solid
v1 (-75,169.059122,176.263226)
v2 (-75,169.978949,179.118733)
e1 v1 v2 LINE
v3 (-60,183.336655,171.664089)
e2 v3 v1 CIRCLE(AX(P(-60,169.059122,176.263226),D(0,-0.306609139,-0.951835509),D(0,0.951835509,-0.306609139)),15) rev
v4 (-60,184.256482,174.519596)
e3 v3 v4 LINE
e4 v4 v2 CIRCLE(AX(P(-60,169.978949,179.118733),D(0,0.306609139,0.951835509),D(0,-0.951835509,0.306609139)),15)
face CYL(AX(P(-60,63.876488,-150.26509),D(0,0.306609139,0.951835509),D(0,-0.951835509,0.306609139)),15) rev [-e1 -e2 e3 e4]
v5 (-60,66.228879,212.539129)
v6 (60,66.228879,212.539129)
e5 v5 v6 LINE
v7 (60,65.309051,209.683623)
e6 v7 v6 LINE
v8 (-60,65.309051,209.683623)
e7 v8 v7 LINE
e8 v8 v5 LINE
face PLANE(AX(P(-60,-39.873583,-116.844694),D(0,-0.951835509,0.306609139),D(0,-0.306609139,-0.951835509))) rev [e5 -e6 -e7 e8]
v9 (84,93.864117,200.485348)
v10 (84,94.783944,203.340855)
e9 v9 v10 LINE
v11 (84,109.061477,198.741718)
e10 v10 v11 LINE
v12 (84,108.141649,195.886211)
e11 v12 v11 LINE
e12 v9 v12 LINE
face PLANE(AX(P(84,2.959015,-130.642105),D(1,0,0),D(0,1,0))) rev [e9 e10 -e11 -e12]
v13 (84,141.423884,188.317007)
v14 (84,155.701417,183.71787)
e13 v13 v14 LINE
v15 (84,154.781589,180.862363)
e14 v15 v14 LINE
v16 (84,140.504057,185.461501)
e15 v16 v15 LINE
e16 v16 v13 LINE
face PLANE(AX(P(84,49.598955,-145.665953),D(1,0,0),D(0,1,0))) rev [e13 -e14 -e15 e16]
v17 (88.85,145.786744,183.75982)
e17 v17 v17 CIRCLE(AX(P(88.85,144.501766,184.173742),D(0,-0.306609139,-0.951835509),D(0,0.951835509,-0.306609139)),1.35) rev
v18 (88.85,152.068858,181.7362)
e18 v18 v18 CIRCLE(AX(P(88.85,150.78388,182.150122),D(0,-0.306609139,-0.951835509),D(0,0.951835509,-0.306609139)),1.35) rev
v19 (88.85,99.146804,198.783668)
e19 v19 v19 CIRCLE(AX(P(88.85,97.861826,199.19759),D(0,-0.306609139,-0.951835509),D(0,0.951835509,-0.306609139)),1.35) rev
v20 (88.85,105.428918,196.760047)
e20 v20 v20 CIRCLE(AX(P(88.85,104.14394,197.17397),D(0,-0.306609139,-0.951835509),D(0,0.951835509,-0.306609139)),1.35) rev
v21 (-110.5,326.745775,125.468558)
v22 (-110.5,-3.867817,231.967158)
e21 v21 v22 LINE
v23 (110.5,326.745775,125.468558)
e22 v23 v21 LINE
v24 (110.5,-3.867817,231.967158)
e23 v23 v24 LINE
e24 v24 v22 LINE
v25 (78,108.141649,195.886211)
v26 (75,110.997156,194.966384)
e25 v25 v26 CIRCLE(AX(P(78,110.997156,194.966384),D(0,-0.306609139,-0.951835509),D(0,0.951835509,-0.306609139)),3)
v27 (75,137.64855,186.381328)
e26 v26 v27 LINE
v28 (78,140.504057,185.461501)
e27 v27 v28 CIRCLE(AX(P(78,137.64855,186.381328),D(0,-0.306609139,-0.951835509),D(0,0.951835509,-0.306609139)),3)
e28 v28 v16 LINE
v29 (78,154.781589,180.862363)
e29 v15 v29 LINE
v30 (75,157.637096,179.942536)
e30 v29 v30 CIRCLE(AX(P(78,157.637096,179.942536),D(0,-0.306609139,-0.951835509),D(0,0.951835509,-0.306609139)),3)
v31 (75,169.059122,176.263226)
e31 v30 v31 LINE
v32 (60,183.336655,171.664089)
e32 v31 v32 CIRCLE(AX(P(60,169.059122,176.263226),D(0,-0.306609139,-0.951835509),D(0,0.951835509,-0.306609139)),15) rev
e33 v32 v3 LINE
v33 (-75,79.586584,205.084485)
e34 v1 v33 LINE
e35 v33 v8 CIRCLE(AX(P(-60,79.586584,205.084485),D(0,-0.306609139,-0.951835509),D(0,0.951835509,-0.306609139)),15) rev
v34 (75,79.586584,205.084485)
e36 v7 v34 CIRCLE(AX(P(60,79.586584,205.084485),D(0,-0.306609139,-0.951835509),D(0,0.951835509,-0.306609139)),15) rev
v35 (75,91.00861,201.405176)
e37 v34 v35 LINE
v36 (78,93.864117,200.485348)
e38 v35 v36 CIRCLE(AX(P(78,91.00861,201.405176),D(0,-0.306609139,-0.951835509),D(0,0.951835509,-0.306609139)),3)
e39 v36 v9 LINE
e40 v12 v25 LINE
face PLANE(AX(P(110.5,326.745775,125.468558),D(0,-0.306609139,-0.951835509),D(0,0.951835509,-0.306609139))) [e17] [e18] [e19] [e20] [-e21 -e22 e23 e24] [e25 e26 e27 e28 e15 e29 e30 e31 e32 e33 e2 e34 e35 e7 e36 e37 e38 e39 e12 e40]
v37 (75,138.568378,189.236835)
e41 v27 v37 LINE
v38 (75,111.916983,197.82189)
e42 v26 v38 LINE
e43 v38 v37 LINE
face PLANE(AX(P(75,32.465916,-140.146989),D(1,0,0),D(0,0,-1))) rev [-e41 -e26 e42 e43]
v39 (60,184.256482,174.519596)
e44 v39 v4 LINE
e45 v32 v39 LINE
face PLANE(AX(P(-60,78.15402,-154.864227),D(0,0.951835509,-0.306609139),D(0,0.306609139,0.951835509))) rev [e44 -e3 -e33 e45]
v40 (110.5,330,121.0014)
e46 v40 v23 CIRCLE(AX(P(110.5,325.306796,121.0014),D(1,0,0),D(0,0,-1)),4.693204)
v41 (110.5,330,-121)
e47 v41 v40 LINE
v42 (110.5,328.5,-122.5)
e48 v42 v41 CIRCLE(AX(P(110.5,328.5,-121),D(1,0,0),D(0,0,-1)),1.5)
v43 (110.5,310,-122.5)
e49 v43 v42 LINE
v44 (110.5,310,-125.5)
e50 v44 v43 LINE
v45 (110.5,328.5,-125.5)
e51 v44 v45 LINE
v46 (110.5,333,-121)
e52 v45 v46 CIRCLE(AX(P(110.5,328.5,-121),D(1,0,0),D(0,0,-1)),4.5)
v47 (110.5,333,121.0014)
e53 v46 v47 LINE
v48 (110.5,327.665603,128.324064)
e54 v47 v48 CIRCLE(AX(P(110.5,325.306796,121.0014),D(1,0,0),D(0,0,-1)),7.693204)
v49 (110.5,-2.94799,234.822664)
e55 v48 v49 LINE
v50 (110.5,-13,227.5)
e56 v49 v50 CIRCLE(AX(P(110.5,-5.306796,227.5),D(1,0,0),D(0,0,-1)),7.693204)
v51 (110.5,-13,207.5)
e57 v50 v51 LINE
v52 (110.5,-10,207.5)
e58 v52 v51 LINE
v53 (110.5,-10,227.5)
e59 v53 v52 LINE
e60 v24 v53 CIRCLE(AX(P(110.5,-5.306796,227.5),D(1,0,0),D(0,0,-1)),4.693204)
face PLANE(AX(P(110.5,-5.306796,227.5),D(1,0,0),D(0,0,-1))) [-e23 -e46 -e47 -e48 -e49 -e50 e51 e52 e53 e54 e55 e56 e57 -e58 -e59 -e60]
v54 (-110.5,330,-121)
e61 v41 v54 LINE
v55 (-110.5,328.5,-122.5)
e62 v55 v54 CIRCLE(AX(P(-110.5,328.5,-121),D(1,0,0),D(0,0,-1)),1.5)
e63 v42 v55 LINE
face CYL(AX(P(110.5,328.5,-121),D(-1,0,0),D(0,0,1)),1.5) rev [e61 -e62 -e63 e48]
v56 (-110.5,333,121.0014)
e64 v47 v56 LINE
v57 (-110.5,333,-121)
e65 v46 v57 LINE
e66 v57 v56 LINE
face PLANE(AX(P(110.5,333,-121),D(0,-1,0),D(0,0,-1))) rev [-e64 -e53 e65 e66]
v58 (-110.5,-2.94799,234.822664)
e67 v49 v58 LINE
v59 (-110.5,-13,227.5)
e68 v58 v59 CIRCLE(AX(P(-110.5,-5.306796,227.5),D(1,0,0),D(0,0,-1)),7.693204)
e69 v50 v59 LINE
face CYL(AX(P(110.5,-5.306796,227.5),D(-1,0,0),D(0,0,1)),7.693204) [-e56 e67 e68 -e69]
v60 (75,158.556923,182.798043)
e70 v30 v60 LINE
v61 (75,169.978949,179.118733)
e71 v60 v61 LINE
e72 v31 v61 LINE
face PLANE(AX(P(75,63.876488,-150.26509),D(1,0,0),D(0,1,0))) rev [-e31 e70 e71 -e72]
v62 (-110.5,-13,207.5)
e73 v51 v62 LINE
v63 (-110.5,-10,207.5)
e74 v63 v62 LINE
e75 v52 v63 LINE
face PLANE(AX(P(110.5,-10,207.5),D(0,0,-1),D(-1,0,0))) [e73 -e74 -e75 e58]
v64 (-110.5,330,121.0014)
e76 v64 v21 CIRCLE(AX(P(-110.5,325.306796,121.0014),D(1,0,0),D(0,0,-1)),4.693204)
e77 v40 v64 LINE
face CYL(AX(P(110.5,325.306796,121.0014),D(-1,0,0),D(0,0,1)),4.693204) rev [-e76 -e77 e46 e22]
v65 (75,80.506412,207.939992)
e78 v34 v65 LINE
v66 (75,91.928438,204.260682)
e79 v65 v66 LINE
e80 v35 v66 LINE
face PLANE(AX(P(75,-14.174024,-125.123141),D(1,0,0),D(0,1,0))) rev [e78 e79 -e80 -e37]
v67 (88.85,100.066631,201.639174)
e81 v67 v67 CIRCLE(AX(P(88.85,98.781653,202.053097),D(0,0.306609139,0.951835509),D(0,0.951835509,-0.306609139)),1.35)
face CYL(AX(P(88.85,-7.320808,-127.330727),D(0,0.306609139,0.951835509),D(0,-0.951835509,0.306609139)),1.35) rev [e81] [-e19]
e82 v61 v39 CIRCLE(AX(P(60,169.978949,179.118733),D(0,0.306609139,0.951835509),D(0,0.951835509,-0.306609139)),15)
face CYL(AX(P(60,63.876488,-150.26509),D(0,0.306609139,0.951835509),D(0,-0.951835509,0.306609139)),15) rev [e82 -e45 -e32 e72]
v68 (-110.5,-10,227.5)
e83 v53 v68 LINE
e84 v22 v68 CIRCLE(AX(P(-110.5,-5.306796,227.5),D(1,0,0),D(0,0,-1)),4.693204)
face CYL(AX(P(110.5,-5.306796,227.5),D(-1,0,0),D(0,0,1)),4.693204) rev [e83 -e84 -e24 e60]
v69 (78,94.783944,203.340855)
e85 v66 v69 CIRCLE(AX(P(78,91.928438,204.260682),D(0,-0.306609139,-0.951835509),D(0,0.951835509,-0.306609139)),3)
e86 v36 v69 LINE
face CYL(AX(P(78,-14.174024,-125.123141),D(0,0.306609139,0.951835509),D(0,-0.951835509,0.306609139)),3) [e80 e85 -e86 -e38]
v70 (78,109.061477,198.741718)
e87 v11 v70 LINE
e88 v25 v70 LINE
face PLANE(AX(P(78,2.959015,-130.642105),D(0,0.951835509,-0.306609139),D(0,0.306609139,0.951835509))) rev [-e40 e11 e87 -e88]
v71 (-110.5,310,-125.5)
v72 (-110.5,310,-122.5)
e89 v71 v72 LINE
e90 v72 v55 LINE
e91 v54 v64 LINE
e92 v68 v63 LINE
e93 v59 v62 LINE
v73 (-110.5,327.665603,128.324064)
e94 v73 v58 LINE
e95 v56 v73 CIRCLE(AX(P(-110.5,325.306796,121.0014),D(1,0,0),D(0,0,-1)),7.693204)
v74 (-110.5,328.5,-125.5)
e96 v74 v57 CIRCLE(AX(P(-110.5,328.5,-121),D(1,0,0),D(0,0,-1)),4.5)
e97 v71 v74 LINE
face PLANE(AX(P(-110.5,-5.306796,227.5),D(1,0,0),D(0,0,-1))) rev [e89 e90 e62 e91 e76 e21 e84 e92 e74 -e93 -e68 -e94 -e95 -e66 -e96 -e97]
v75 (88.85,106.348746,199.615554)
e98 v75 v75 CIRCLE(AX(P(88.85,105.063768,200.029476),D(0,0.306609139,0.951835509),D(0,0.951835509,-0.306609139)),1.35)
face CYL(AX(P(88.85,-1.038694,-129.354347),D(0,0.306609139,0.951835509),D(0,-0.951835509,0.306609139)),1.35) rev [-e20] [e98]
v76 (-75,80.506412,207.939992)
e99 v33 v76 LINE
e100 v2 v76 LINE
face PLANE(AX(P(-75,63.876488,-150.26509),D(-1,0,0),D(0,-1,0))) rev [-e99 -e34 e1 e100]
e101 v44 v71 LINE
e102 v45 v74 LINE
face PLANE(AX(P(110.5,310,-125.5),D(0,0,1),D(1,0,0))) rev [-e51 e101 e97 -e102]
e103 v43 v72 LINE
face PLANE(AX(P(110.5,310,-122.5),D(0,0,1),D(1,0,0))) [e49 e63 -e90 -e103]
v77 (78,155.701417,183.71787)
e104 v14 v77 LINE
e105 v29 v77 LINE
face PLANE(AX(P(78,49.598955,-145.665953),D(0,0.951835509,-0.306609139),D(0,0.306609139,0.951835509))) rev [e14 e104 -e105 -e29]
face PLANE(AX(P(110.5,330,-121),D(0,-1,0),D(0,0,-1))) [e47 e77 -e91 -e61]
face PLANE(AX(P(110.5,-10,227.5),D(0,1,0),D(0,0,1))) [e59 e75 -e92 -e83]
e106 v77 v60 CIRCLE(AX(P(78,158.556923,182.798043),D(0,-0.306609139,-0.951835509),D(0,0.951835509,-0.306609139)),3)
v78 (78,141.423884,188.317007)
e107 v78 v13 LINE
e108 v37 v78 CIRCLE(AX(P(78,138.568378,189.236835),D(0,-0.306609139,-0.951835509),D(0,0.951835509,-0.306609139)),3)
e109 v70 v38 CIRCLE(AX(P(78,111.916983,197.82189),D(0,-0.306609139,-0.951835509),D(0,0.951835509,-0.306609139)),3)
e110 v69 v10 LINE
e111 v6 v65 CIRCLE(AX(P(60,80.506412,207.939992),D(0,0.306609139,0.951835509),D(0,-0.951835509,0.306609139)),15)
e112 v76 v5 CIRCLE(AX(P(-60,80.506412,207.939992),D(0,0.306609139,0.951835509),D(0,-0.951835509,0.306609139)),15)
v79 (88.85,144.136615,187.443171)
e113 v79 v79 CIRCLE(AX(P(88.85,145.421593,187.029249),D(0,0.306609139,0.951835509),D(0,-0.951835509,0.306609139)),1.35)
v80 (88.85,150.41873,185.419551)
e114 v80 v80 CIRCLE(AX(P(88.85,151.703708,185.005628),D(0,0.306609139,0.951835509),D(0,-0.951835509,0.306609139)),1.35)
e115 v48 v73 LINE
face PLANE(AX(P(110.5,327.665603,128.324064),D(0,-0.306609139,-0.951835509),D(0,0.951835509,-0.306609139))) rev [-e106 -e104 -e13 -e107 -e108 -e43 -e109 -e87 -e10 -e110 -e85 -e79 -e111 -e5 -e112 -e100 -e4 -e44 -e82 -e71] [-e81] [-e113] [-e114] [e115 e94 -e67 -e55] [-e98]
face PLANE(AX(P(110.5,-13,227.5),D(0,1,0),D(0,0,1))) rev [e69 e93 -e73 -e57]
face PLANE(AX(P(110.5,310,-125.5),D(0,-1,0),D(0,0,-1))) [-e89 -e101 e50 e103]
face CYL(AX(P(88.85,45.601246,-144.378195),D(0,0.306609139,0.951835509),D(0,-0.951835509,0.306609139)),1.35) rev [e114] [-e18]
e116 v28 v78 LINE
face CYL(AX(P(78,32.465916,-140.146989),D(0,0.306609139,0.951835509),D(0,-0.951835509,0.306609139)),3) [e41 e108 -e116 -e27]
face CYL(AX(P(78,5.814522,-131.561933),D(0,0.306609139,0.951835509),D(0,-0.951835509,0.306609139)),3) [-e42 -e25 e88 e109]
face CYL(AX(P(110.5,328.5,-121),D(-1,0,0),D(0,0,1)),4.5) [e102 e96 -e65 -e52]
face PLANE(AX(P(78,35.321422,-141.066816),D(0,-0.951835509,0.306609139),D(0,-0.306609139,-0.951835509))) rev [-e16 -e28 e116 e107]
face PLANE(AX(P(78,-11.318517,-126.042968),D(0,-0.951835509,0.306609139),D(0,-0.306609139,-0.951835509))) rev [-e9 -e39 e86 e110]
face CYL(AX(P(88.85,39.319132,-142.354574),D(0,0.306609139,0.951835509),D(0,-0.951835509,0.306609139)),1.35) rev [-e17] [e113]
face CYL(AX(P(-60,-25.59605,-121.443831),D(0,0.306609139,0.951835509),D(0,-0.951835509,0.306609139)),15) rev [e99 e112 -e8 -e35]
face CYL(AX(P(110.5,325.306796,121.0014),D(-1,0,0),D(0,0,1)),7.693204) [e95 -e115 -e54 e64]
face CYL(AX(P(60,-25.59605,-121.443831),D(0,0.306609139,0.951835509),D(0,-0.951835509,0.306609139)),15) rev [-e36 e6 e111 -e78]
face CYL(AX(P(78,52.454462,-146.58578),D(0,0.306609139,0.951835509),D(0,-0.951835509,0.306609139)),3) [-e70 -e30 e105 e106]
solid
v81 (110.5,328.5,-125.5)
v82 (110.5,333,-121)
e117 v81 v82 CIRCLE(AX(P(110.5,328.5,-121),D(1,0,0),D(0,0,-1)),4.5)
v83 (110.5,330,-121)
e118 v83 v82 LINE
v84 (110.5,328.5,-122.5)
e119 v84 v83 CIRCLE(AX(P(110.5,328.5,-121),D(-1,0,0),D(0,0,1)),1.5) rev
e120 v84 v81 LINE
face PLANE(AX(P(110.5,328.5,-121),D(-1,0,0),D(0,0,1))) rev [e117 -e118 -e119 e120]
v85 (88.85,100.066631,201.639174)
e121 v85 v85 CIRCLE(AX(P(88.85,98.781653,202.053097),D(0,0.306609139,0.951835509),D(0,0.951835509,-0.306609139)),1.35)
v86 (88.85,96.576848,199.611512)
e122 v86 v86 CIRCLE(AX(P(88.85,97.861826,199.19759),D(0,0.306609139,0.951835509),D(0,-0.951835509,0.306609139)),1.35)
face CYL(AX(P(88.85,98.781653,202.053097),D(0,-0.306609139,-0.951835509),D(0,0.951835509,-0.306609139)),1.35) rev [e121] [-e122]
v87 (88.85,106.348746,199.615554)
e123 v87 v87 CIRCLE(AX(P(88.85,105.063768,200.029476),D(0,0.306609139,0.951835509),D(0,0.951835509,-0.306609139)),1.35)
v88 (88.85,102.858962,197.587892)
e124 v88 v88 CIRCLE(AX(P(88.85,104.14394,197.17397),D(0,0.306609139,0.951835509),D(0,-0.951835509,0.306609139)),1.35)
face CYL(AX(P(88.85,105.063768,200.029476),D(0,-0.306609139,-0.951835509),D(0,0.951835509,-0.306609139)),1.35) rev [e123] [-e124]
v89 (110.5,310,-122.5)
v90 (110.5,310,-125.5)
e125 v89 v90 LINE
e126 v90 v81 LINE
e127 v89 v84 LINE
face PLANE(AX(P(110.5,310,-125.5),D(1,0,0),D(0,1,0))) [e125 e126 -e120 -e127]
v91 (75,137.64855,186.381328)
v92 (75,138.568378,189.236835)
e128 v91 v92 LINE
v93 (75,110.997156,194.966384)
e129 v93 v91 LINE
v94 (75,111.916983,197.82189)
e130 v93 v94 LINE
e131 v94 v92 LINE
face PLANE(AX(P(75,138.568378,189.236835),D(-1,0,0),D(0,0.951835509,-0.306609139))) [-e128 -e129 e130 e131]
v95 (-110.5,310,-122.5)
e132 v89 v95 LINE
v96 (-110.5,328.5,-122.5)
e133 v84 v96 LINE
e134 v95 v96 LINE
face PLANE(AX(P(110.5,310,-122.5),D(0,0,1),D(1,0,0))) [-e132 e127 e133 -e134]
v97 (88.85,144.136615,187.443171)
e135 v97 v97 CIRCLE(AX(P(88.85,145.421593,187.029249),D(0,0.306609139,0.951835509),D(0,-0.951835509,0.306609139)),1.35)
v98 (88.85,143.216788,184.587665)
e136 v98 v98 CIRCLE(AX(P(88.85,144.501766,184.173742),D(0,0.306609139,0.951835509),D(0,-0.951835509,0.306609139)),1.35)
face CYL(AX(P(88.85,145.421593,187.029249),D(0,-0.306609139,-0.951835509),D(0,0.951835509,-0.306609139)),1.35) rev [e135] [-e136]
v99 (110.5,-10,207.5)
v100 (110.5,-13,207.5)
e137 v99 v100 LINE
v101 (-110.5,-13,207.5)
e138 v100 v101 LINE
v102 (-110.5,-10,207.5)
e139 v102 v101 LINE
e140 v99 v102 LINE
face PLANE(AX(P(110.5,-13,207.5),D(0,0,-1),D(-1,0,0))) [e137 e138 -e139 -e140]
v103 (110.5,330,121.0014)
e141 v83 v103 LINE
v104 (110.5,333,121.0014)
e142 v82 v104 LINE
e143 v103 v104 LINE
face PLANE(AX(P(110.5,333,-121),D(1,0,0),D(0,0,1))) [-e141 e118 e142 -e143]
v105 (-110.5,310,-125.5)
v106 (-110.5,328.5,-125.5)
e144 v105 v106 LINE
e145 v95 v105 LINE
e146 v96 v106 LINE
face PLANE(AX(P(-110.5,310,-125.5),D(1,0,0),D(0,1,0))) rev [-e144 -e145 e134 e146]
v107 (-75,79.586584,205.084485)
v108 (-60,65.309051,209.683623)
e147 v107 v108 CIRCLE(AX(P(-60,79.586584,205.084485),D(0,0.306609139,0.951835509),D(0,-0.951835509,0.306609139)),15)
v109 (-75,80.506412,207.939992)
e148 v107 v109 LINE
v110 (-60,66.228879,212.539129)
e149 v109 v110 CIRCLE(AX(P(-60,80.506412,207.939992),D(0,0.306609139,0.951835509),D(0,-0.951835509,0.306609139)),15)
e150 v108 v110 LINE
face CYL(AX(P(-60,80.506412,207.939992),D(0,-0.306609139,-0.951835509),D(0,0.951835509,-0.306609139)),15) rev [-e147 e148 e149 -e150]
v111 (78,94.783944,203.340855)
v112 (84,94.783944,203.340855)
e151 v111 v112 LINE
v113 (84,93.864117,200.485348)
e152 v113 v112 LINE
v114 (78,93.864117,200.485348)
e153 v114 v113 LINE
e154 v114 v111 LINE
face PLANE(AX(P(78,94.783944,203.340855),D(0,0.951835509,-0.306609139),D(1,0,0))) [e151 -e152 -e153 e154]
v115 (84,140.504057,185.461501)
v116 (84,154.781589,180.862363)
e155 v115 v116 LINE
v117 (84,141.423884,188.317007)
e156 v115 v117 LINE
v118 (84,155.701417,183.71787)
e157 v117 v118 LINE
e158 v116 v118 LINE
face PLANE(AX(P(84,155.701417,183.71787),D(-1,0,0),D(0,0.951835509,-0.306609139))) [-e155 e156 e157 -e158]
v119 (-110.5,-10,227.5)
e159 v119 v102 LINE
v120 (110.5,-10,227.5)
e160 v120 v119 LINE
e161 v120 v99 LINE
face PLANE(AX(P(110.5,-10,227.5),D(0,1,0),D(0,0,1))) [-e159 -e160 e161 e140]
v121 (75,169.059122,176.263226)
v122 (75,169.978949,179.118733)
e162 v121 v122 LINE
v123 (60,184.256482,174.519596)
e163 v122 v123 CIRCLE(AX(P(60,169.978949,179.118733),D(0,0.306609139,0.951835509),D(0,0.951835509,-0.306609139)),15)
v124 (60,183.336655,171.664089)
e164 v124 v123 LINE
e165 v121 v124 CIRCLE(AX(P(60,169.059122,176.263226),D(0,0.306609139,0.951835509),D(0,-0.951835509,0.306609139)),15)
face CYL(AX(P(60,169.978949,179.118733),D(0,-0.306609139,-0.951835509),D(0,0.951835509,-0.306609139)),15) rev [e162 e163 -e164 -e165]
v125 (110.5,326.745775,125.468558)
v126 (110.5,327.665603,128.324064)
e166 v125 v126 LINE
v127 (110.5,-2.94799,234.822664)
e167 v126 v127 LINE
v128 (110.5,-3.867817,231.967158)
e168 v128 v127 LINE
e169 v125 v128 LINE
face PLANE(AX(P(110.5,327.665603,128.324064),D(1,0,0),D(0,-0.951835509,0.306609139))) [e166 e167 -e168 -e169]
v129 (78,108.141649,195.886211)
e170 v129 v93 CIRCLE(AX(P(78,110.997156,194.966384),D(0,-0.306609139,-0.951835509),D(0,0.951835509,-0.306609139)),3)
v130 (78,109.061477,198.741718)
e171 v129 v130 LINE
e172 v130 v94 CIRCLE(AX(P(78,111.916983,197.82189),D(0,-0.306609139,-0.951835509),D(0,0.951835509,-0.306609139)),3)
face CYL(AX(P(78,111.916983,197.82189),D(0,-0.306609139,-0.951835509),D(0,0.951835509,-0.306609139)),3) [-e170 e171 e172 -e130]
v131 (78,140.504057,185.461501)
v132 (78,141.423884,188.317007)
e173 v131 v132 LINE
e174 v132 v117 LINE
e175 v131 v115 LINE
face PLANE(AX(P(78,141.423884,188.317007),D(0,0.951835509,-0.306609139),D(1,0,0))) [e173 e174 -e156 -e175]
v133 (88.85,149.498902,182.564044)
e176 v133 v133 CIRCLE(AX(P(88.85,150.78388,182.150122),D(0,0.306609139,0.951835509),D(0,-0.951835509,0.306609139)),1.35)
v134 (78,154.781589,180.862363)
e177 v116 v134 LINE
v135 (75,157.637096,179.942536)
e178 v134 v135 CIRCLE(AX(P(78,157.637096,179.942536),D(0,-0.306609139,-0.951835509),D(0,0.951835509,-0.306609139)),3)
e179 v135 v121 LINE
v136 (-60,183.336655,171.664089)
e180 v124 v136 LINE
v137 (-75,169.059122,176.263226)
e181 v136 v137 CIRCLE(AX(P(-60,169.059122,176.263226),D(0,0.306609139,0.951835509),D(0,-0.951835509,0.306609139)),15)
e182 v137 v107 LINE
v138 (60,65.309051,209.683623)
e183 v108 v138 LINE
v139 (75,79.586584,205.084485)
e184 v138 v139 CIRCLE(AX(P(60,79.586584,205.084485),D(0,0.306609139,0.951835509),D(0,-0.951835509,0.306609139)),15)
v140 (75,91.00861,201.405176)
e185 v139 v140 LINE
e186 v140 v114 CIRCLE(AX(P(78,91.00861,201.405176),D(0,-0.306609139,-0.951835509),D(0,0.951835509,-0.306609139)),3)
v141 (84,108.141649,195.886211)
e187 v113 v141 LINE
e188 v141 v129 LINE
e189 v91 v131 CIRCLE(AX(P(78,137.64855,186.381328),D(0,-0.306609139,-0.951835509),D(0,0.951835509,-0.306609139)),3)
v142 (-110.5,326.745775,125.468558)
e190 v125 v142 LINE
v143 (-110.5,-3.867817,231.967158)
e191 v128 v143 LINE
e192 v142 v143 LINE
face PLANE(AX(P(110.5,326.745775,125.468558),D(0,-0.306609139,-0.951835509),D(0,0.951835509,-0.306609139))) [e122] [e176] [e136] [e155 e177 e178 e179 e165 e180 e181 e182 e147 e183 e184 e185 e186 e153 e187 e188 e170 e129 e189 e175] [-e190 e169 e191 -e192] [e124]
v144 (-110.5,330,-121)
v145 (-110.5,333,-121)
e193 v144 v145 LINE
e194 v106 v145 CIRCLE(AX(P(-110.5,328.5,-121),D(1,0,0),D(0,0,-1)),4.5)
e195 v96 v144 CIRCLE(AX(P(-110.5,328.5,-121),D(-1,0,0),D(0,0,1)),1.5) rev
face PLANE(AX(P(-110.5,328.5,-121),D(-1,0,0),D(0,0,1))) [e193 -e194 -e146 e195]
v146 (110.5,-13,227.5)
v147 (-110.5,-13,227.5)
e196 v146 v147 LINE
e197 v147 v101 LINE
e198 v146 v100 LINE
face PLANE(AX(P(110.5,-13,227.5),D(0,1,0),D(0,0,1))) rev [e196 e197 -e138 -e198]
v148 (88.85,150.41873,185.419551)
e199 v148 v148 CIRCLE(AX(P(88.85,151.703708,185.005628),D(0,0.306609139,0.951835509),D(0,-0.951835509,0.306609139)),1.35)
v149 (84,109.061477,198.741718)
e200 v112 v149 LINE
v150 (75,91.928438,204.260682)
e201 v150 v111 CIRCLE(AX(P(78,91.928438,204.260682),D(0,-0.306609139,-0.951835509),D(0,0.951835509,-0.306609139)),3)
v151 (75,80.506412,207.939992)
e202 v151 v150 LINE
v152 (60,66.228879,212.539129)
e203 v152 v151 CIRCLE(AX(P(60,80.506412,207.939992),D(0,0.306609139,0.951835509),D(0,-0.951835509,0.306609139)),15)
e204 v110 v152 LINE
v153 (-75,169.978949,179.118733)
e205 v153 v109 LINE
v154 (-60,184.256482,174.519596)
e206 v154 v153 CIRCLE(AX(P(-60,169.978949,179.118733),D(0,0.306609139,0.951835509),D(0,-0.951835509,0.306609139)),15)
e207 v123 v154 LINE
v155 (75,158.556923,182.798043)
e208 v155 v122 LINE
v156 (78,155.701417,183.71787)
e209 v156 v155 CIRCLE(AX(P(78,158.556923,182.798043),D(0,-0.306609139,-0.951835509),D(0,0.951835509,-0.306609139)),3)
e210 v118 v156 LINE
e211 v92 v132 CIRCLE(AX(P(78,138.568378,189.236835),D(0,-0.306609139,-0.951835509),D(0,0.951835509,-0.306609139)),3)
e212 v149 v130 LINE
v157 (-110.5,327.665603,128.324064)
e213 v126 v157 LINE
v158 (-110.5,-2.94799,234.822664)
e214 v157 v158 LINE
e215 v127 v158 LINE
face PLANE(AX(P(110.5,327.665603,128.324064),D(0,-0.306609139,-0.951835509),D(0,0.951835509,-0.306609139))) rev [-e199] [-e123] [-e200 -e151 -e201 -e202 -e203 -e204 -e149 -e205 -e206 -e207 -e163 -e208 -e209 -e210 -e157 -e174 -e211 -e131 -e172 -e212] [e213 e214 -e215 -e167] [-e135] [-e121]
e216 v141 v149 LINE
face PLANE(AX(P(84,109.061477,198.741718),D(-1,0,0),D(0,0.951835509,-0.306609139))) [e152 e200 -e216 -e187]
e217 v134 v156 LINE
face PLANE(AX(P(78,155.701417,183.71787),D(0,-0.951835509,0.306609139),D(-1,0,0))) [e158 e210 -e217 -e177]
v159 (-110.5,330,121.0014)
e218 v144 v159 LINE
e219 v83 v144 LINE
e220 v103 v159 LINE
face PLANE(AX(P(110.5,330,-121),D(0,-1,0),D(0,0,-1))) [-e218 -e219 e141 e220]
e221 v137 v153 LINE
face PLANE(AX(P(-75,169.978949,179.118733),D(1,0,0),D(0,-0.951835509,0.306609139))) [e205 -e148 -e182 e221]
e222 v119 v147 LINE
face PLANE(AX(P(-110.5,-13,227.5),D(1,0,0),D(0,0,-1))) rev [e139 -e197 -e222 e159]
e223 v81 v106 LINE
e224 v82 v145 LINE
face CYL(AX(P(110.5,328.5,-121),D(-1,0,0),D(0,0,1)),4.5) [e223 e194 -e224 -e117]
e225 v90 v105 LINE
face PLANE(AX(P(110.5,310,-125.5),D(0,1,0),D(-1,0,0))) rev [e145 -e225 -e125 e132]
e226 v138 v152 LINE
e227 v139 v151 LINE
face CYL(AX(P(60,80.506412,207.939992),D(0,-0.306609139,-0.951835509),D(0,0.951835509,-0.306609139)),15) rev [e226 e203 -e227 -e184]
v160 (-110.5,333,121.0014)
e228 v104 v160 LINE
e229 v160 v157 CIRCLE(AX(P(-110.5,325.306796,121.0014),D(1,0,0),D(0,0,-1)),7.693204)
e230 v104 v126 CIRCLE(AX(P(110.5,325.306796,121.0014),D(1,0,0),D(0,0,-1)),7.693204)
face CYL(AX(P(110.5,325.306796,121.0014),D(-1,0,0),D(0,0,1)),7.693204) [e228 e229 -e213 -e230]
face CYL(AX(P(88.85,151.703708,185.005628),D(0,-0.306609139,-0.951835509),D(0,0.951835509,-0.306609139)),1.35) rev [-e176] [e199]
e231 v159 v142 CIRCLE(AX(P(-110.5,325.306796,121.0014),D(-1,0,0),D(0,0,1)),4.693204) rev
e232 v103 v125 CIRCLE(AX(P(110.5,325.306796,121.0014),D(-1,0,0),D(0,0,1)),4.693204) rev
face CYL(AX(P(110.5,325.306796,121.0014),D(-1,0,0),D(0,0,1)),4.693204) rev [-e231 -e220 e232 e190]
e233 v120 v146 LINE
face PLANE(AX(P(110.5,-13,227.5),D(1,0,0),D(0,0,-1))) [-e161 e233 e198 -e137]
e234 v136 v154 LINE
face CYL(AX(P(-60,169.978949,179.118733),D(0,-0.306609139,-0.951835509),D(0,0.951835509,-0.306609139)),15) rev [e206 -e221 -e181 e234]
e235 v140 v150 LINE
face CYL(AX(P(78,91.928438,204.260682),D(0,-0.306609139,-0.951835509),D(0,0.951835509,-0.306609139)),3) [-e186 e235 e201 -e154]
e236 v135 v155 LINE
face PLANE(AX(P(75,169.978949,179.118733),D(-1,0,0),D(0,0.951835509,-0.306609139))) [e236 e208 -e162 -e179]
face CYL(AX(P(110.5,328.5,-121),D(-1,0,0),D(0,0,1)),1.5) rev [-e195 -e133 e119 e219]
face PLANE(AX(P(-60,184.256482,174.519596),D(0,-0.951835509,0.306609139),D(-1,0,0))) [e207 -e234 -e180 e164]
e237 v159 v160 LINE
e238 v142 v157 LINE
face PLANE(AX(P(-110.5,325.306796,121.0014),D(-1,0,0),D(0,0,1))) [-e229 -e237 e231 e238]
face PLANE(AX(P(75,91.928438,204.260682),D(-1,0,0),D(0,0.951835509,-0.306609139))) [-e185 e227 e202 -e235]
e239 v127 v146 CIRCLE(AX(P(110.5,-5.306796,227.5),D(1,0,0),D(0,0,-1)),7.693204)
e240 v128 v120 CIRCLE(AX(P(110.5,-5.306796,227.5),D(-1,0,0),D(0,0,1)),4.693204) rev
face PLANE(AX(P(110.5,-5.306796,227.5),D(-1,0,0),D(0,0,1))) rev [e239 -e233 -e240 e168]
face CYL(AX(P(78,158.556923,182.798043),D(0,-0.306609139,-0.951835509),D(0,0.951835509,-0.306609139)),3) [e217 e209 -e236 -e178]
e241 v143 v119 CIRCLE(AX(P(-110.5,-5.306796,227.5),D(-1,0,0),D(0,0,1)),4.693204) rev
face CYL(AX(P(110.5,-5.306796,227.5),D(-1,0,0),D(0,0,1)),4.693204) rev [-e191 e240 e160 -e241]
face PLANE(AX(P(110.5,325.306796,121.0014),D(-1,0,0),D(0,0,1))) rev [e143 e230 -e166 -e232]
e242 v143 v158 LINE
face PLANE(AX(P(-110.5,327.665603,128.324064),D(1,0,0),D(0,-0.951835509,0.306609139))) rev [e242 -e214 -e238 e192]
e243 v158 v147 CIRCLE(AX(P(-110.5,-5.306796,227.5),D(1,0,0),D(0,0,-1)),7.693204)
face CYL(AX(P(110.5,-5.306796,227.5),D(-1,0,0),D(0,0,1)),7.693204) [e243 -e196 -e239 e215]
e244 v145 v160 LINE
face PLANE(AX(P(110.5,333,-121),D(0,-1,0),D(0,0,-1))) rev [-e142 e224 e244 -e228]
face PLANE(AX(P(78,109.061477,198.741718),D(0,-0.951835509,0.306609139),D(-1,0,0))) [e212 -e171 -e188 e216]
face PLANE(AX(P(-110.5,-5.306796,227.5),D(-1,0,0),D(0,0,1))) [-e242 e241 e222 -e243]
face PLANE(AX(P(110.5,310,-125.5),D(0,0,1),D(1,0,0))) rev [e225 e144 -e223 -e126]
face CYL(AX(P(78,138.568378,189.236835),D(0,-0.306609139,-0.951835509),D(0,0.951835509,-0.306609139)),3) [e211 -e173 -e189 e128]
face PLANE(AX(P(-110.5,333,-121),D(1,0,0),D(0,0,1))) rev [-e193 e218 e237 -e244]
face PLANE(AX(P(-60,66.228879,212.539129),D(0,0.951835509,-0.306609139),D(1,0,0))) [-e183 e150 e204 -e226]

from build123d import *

# Parameters (mm, degrees)
EXTRUDE_THIN1_DEPTH    = 110.5
CUT_EXTRUDE1_REACH     = 444.866
SKETCH2_R              = 1.35
CONVERT_SOLID1_START   = -110.5
CONVERT_SOLID1_DEPTH   = 221
CONVERT_SOLID1_2_DEPTH = 35.5
CONVERT_SOLID1_START_2 = 78
CONVERT_SOLID1_3_DEPTH = 32.5
CONVERT_SOLID1_START_3 = 90.2000001
CONVERT_SOLID1_4_DEPTH = 20.2999999
CONVERT_SOLID1_START_4 = 84
CONVERT_SOLID1_5_DEPTH = 3.4999999
CONVERT_SOLID1_START_5 = 219.608669628
CONVERT_SOLID1_6_DEPTH = 3.000000001


with BuildPart() as part:
    # Sketch1 → Extrude-Thin1 (new, symmetric)
    with BuildSketch(Plane(origin=(0, 0, 0), x_dir=(0, 0, -1), z_dir=(1, 0, 0))):
        with BuildLine():
            Line((122.5, 310), (122.5, 328.5))
            ThreePointArc((122.5, 328.5), (122.060660172, 329.560660172), (121, 330))
            Line((121, 330), (-121.0014, 330))
            ThreePointArc((-121.0014, 330), (-123.764798126, 329.10018419), (-125.468557887, 326.745775479))
            Line((-125.468557887, 326.745775479), (-231.967157887, -3.867817213))
            ThreePointArc((-231.967157887, -3.867817213), (-231.293387843, -8.070194473), (-227.5, -10))
            Line((-227.5, -10), (-207.5, -10))
            Line((-207.5, -10), (-207.5, -13))
            Line((-207.5, -13), (-227.5, -13))
            ThreePointArc((-227.5, -13), (-233.718205595, -9.836619923), (-234.822664414, -2.947989795))
            Line((-234.822664414, -2.947989795), (-128.324064414, 327.665602897))
            ThreePointArc((-128.324064414, 327.665602897), (-125.531223577, 331.525001941), (-121.0014, 333))
            Line((-121.0014, 333), (121, 333))
            ThreePointArc((121, 333), (124.181980515, 331.681980515), (125.5, 328.5))
            Line((125.5, 328.5), (125.5, 310))
            Line((125.5, 310), (122.5, 310))
        make_face()
    extrude(amount=EXTRUDE_THIN1_DEPTH, both=True)

    # Sketch2 → Cut-Extrude1 (cut, up to next)
    with BuildSketch(Plane(origin=(0, 68.253852605, 211.886836303), x_dir=(1, 0, 0), z_dir=(0, 0.30660913934042044, 0.9518355087266532)), mode=Mode.PRIVATE) as cut_extrude1_sk1:
        with Locations(Location((88.85, 87.672559187, 0), (0, 0, 270))):
            Circle(SKETCH2_R)
    cut_extrude1_tool1 = extrude(cut_extrude1_sk1.sketch, amount=-CUT_EXTRUDE1_REACH, mode=Mode.PRIVATE) & part.part
    # Sketch2 → Cut-Extrude1 (cut, up to next)
    with BuildSketch(Plane(origin=(0, 68.253852605, 211.886836303), x_dir=(1, 0, 0), z_dir=(0, 0.30660913934042044, 0.9518355087266532)), mode=Mode.PRIVATE) as cut_extrude1_sk2:
        with Locations(Location((88.85, 81.072559187, 0), (0, 0, 270))):
            Circle(SKETCH2_R)
    cut_extrude1_tool2 = extrude(cut_extrude1_sk2.sketch, amount=-CUT_EXTRUDE1_REACH, mode=Mode.PRIVATE) & part.part
    # Sketch2 → Cut-Extrude1 (cut, up to next)
    with BuildSketch(Plane(origin=(0, 68.253852605, 211.886836303), x_dir=(1, 0, 0), z_dir=(0, 0.30660913934042044, 0.9518355087266532)), mode=Mode.PRIVATE) as cut_extrude1_sk3:
        with Locations(Location((88.85, 38.672559187, 0), (0, 0, 90))):
            Circle(SKETCH2_R)
    cut_extrude1_tool3 = extrude(cut_extrude1_sk3.sketch, amount=-CUT_EXTRUDE1_REACH, mode=Mode.PRIVATE) & part.part
    # Sketch2 → Cut-Extrude1 (cut, up to next)
    with BuildSketch(Plane(origin=(0, 68.253852605, 211.886836303), x_dir=(1, 0, 0), z_dir=(0, 0.30660913934042044, 0.9518355087266532)), mode=Mode.PRIVATE) as cut_extrude1_sk4:
        with Locations(Location((88.85, 32.072559187, 0), (0, 0, 90))):
            Circle(SKETCH2_R)
    cut_extrude1_tool4 = extrude(cut_extrude1_sk4.sketch, amount=-CUT_EXTRUDE1_REACH, mode=Mode.PRIVATE) & part.part
    # Sketch2 → Cut-Extrude1 (cut, up to next)
    with BuildSketch(Plane(origin=(0, 68.253852605, 211.886836303), x_dir=(1, 0, 0), z_dir=(0, 0.30660913934042044, 0.9518355087266532)), mode=Mode.PRIVATE) as cut_extrude1_sk5:
        with BuildLine():
            Line((-60, 121.872559187), (60, 121.872559187))
            ThreePointArc((60, 121.872559187), (70.606601718, 117.479160904), (75, 106.872559187))
            Line((75, 106.872559187), (75, 94.872559187))
            ThreePointArc((75, 94.872559187), (75.878679656, 92.751238843), (78, 91.872559187))
            Line((78, 91.872559187), (84, 91.872559187))
            Line((84, 91.872559187), (84, 76.872559187))
            Line((84, 76.872559187), (78, 76.872559187))
            ThreePointArc((78, 76.872559187), (75.878679656, 75.99387953), (75, 73.872559187))
            Line((75, 73.872559187), (75, 45.872559187))
            ThreePointArc((75, 45.872559187), (75.878679656, 43.751238843), (78, 42.872559187))
            Line((78, 42.872559187), (84, 42.872559187))
            Line((84, 42.872559187), (84, 27.872559187))
            Line((84, 27.872559187), (78, 27.872559187))
            ThreePointArc((78, 27.872559187), (75.878679656, 26.99387953), (75, 24.872559187))
            Line((75, 24.872559187), (75, 12.872559187))
            ThreePointArc((75, 12.872559187), (70.606601718, 2.265957469), (60, -2.127440813))
            Line((60, -2.127440813), (-60, -2.127440813))
            ThreePointArc((-60, -2.127440813), (-70.606601718, 2.265957469), (-75, 12.872559187))
            Line((-75, 12.872559187), (-75, 106.872559187))
            ThreePointArc((-75, 106.872559187), (-70.606601718, 117.479160904), (-60, 121.872559187))
        make_face()
    cut_extrude1_tool5 = extrude(cut_extrude1_sk5.sketch, amount=-CUT_EXTRUDE1_REACH, mode=Mode.PRIVATE) & part.part
    add(cut_extrude1_tool1.solids().sort_by_distance((88.85, 151.703708, 185.005628))[0], mode=Mode.SUBTRACT)
    add(cut_extrude1_tool2.solids().sort_by_distance((88.85, 145.421593, 187.029249))[0], mode=Mode.SUBTRACT)
    add(cut_extrude1_tool3.solids().sort_by_distance((88.85, 105.063768, 200.029476))[0], mode=Mode.SUBTRACT)
    add(cut_extrude1_tool4.solids().sort_by_distance((88.85, 98.781653, 202.053097))[0], mode=Mode.SUBTRACT)
    add(cut_extrude1_tool5.solids().sort_by_distance((1.180096, 125.24268, 193.529362))[0], mode=Mode.SUBTRACT)


with BuildPart() as body_2:
    # Convert-Solid1: read off the stored shape, not the designer's step
    # Convert-Solid1 outline → Convert-Solid1 (new body)
    with BuildSketch(Plane.YZ.offset(CONVERT_SOLID1_START)):
        with BuildLine():
            Line((-13, 227.5), (-13, 207.5))
            Line((-13, 207.5), (-10, 207.5))
            Line((-10, 207.5), (-10, 227.5))
            ThreePointArc((-10, 227.5), (-8.070194473, 231.293387843), (-3.867817213, 231.967157887))
            Line((-3.867817213, 231.967157887), (65.309051478, 209.683622573))
            Line((65.309051478, 209.683622573), (66.228878896, 212.5391291))
            Line((66.228878896, 212.5391291), (-2.947989795, 234.822664414))
            ThreePointArc((-2.947989795, 234.822664414), (-9.836619923, 233.718205595), (-13, 227.5))
        make_face()
        with BuildLine():
            Line((327.665602897, 128.324064414), (184.256481978, 174.519595822))
            Line((184.256481978, 174.519595822), (183.33665456, 171.664089295))
            Line((183.33665456, 171.664089295), (326.745775479, 125.468557887))
            ThreePointArc((326.745775479, 125.468557887), (329.10018419, 123.764798127), (330, 121.0014))
            Line((330, 121.0014), (330, -121))
            ThreePointArc((330, -121), (329.560660172, -122.060660172), (328.5, -122.5))
            Line((328.5, -122.5), (310, -122.5))
            Line((310, -122.5), (310, -125.5))
            Line((310, -125.5), (328.5, -125.5))
            ThreePointArc((328.5, -125.5), (331.681980515, -124.181980515), (333, -121))
            Line((333, -121), (333, 121.0014))
            ThreePointArc((333, 121.0014), (331.525001941, 125.531223577), (327.665602897, 128.324064414))
        make_face()
    extrude(amount=CONVERT_SOLID1_DEPTH)

    # Convert-Solid1 2 outline → Convert-Solid1 2 (add)
    with BuildSketch(Plane.YZ.offset(CONVERT_SOLID1_START)):
        Polygon((66.228878896, 212.5391291), (65.309051478, 209.683622574), (183.33665456, 171.664089295), (184.256481978, 174.519595822), align=None)
    extrude(amount=CONVERT_SOLID1_2_DEPTH)

    # Convert-Solid1 3 outline → Convert-Solid1 3 (add)
    with BuildSketch(Plane.YZ.offset(CONVERT_SOLID1_START_2)):
        Polygon((94.783944157, 203.34085492), (66.228878896, 212.5391291), (65.309051478, 209.683622574), (93.864116739, 200.485348393), align=None)
        Polygon((141.423884085, 188.317007092), (109.061476788, 198.74171783), (108.14164937, 195.886211303), (140.504056667, 185.461500565), align=None)
        Polygon((184.256481978, 174.519595822), (155.701416716, 183.717870002), (154.781589298, 180.862363476), (183.33665456, 171.664089295), align=None)
    extrude(amount=CONVERT_SOLID1_3_DEPTH)

    # Convert-Solid1 4 outline → Convert-Solid1 4 (add)
    with BuildSketch(Plane.YZ.offset(CONVERT_SOLID1_START_3)):
        Polygon((109.061476788, 198.74171783), (94.783944157, 203.34085492), (93.864116739, 200.485348393), (108.14164937, 195.886211303), align=None)
        Polygon((155.701416716, 183.717870002), (141.423884085, 188.317007092), (140.504056667, 185.461500566), (154.781589298, 180.862363475), align=None)
    extrude(amount=CONVERT_SOLID1_4_DEPTH)

    # Convert-Solid1 5 outline → Convert-Solid1 5 (add)
    with BuildSketch(Plane.YZ.offset(CONVERT_SOLID1_START_4)):
        Polygon((109.061476788, 198.74171783), (94.783944157, 203.34085492), (93.864116739, 200.485348393), (108.14164937, 195.886211303), align=None)
        Polygon((155.701416716, 183.717870002), (141.423884085, 188.317007092), (140.504056667, 185.461500566), (154.781589298, 180.862363475), align=None)
    extrude(amount=CONVERT_SOLID1_5_DEPTH)

    # Convert-Solid1 6 outline → Convert-Solid1 6 (add)
    with BuildSketch(Plane(origin=(0, 0, 0), x_dir=(1, 0, 0), z_dir=(0, 0.3066091393404201, 0.9518355087266533)).offset(CONVERT_SOLID1_START_5)):
        with BuildLine():
            Line((90.2000001, 27.872559186), (90.2, 32.072559187))
            ThreePointArc((90.2, 32.072559187), (88.85, 30.722559187), (87.5, 32.072559187))
            Line((87.5, 32.072559187), (87.4999999, 27.872559186))
            Line((87.4999999, 27.872559186), (90.2000001, 27.872559186))
        make_face()
        with BuildLine():
            ThreePointArc((87.5, 32.072559187), (88.85, 33.422559187), (90.2, 32.072559187))
            Line((90.2, 32.072559187), (90.2, 38.672559187))
            ThreePointArc((90.2, 38.672559187), (88.85, 37.322559187), (87.5, 38.672559187))
            Line((87.5, 38.672559187), (87.5, 32.072559187))
        make_face()
        with BuildLine():
            ThreePointArc((87.5, 38.672559187), (88.85, 40.022559187), (90.2, 38.672559187))
            Line((90.2, 38.672559187), (90.2000001, 42.872559186))
            Line((90.2000001, 42.872559186), (87.4999999, 42.872559186))
            Line((87.4999999, 42.872559186), (87.5, 38.672559187))
        make_face()
        with BuildLine():
            Line((90.2000001, 76.872559186), (90.2, 81.072559187))
            ThreePointArc((90.2, 81.072559187), (88.85, 79.722559187), (87.5, 81.072559187))
            Line((87.5, 81.072559187), (87.4999999, 76.872559186))
            Line((87.4999999, 76.872559186), (90.2000001, 76.872559186))
        make_face()
        with BuildLine():
            ThreePointArc((87.5, 81.072559187), (88.85, 82.422559187), (90.2, 81.072559187))
            Line((90.2, 81.072559187), (90.2, 87.672559187))
            ThreePointArc((90.2, 87.672559187), (88.85, 86.322559187), (87.5, 87.672559187))
            Line((87.5, 87.672559187), (87.5, 81.072559187))
        make_face()
        with BuildLine():
            ThreePointArc((87.5, 87.672559187), (88.85, 89.022559187), (90.2, 87.672559187))
            Line((90.2, 87.672559187), (90.2000001, 91.872559187))
            Line((90.2000001, 91.872559187), (87.4999999, 91.872559187))
            Line((87.4999999, 91.872559187), (87.5, 87.672559187))
        make_face()
        with BuildLine():
            Line((78, -2.127440813), (78, 27.872559187))
            ThreePointArc((78, 27.872559187), (75.878679656, 26.99387953), (75, 24.872559187))
            Line((75, 24.872559187), (75, 12.872559187))
            ThreePointArc((75, 12.872559187), (70.606601718, 2.265957469), (60, -2.127440813))
            Line((60, -2.127440813), (78, -2.127440813))
        make_face()
        with BuildLine():
            Line((78, 121.872559187), (60, 121.872559187))
            ThreePointArc((60, 121.872559187), (70.606601717, 117.479160904), (75, 106.872559187))
            Line((75, 106.872559187), (75, 94.872559187))
            ThreePointArc((75, 94.872559187), (75.878679656, 92.751238843), (78, 91.872559187))
            Line((78, 91.872559187), (78, 121.872559187))
        make_face()
        with BuildLine():
            Line((-75, 121.872559187), (-75, 106.872559187))
            ThreePointArc((-75, 106.872559187), (-70.606601717, 117.479160904), (-60, 121.872559187))
            Line((-60, 121.872559187), (-75, 121.872559187))
        make_face()
        with BuildLine():
            Line((-75, -2.127440813), (-60, -2.127440813))
            ThreePointArc((-60, -2.127440813), (-70.606601718, 2.265957469), (-75, 12.872559187))
            Line((-75, 12.872559187), (-75, -2.127440813))
        make_face()
        with BuildLine():
            Line((75, 73.872559187), (75, 45.872559187))
            ThreePointArc((75, 45.872559187), (75.878679656, 43.751238843), (78, 42.872559187))
            Line((78, 42.872559187), (78, 76.872559187))
            ThreePointArc((78, 76.872559187), (75.878679656, 75.99387953), (75, 73.872559187))
        make_face()
    extrude(amount=CONVERT_SOLID1_6_DEPTH)


solid = Compound([part.part, body_2.part])
